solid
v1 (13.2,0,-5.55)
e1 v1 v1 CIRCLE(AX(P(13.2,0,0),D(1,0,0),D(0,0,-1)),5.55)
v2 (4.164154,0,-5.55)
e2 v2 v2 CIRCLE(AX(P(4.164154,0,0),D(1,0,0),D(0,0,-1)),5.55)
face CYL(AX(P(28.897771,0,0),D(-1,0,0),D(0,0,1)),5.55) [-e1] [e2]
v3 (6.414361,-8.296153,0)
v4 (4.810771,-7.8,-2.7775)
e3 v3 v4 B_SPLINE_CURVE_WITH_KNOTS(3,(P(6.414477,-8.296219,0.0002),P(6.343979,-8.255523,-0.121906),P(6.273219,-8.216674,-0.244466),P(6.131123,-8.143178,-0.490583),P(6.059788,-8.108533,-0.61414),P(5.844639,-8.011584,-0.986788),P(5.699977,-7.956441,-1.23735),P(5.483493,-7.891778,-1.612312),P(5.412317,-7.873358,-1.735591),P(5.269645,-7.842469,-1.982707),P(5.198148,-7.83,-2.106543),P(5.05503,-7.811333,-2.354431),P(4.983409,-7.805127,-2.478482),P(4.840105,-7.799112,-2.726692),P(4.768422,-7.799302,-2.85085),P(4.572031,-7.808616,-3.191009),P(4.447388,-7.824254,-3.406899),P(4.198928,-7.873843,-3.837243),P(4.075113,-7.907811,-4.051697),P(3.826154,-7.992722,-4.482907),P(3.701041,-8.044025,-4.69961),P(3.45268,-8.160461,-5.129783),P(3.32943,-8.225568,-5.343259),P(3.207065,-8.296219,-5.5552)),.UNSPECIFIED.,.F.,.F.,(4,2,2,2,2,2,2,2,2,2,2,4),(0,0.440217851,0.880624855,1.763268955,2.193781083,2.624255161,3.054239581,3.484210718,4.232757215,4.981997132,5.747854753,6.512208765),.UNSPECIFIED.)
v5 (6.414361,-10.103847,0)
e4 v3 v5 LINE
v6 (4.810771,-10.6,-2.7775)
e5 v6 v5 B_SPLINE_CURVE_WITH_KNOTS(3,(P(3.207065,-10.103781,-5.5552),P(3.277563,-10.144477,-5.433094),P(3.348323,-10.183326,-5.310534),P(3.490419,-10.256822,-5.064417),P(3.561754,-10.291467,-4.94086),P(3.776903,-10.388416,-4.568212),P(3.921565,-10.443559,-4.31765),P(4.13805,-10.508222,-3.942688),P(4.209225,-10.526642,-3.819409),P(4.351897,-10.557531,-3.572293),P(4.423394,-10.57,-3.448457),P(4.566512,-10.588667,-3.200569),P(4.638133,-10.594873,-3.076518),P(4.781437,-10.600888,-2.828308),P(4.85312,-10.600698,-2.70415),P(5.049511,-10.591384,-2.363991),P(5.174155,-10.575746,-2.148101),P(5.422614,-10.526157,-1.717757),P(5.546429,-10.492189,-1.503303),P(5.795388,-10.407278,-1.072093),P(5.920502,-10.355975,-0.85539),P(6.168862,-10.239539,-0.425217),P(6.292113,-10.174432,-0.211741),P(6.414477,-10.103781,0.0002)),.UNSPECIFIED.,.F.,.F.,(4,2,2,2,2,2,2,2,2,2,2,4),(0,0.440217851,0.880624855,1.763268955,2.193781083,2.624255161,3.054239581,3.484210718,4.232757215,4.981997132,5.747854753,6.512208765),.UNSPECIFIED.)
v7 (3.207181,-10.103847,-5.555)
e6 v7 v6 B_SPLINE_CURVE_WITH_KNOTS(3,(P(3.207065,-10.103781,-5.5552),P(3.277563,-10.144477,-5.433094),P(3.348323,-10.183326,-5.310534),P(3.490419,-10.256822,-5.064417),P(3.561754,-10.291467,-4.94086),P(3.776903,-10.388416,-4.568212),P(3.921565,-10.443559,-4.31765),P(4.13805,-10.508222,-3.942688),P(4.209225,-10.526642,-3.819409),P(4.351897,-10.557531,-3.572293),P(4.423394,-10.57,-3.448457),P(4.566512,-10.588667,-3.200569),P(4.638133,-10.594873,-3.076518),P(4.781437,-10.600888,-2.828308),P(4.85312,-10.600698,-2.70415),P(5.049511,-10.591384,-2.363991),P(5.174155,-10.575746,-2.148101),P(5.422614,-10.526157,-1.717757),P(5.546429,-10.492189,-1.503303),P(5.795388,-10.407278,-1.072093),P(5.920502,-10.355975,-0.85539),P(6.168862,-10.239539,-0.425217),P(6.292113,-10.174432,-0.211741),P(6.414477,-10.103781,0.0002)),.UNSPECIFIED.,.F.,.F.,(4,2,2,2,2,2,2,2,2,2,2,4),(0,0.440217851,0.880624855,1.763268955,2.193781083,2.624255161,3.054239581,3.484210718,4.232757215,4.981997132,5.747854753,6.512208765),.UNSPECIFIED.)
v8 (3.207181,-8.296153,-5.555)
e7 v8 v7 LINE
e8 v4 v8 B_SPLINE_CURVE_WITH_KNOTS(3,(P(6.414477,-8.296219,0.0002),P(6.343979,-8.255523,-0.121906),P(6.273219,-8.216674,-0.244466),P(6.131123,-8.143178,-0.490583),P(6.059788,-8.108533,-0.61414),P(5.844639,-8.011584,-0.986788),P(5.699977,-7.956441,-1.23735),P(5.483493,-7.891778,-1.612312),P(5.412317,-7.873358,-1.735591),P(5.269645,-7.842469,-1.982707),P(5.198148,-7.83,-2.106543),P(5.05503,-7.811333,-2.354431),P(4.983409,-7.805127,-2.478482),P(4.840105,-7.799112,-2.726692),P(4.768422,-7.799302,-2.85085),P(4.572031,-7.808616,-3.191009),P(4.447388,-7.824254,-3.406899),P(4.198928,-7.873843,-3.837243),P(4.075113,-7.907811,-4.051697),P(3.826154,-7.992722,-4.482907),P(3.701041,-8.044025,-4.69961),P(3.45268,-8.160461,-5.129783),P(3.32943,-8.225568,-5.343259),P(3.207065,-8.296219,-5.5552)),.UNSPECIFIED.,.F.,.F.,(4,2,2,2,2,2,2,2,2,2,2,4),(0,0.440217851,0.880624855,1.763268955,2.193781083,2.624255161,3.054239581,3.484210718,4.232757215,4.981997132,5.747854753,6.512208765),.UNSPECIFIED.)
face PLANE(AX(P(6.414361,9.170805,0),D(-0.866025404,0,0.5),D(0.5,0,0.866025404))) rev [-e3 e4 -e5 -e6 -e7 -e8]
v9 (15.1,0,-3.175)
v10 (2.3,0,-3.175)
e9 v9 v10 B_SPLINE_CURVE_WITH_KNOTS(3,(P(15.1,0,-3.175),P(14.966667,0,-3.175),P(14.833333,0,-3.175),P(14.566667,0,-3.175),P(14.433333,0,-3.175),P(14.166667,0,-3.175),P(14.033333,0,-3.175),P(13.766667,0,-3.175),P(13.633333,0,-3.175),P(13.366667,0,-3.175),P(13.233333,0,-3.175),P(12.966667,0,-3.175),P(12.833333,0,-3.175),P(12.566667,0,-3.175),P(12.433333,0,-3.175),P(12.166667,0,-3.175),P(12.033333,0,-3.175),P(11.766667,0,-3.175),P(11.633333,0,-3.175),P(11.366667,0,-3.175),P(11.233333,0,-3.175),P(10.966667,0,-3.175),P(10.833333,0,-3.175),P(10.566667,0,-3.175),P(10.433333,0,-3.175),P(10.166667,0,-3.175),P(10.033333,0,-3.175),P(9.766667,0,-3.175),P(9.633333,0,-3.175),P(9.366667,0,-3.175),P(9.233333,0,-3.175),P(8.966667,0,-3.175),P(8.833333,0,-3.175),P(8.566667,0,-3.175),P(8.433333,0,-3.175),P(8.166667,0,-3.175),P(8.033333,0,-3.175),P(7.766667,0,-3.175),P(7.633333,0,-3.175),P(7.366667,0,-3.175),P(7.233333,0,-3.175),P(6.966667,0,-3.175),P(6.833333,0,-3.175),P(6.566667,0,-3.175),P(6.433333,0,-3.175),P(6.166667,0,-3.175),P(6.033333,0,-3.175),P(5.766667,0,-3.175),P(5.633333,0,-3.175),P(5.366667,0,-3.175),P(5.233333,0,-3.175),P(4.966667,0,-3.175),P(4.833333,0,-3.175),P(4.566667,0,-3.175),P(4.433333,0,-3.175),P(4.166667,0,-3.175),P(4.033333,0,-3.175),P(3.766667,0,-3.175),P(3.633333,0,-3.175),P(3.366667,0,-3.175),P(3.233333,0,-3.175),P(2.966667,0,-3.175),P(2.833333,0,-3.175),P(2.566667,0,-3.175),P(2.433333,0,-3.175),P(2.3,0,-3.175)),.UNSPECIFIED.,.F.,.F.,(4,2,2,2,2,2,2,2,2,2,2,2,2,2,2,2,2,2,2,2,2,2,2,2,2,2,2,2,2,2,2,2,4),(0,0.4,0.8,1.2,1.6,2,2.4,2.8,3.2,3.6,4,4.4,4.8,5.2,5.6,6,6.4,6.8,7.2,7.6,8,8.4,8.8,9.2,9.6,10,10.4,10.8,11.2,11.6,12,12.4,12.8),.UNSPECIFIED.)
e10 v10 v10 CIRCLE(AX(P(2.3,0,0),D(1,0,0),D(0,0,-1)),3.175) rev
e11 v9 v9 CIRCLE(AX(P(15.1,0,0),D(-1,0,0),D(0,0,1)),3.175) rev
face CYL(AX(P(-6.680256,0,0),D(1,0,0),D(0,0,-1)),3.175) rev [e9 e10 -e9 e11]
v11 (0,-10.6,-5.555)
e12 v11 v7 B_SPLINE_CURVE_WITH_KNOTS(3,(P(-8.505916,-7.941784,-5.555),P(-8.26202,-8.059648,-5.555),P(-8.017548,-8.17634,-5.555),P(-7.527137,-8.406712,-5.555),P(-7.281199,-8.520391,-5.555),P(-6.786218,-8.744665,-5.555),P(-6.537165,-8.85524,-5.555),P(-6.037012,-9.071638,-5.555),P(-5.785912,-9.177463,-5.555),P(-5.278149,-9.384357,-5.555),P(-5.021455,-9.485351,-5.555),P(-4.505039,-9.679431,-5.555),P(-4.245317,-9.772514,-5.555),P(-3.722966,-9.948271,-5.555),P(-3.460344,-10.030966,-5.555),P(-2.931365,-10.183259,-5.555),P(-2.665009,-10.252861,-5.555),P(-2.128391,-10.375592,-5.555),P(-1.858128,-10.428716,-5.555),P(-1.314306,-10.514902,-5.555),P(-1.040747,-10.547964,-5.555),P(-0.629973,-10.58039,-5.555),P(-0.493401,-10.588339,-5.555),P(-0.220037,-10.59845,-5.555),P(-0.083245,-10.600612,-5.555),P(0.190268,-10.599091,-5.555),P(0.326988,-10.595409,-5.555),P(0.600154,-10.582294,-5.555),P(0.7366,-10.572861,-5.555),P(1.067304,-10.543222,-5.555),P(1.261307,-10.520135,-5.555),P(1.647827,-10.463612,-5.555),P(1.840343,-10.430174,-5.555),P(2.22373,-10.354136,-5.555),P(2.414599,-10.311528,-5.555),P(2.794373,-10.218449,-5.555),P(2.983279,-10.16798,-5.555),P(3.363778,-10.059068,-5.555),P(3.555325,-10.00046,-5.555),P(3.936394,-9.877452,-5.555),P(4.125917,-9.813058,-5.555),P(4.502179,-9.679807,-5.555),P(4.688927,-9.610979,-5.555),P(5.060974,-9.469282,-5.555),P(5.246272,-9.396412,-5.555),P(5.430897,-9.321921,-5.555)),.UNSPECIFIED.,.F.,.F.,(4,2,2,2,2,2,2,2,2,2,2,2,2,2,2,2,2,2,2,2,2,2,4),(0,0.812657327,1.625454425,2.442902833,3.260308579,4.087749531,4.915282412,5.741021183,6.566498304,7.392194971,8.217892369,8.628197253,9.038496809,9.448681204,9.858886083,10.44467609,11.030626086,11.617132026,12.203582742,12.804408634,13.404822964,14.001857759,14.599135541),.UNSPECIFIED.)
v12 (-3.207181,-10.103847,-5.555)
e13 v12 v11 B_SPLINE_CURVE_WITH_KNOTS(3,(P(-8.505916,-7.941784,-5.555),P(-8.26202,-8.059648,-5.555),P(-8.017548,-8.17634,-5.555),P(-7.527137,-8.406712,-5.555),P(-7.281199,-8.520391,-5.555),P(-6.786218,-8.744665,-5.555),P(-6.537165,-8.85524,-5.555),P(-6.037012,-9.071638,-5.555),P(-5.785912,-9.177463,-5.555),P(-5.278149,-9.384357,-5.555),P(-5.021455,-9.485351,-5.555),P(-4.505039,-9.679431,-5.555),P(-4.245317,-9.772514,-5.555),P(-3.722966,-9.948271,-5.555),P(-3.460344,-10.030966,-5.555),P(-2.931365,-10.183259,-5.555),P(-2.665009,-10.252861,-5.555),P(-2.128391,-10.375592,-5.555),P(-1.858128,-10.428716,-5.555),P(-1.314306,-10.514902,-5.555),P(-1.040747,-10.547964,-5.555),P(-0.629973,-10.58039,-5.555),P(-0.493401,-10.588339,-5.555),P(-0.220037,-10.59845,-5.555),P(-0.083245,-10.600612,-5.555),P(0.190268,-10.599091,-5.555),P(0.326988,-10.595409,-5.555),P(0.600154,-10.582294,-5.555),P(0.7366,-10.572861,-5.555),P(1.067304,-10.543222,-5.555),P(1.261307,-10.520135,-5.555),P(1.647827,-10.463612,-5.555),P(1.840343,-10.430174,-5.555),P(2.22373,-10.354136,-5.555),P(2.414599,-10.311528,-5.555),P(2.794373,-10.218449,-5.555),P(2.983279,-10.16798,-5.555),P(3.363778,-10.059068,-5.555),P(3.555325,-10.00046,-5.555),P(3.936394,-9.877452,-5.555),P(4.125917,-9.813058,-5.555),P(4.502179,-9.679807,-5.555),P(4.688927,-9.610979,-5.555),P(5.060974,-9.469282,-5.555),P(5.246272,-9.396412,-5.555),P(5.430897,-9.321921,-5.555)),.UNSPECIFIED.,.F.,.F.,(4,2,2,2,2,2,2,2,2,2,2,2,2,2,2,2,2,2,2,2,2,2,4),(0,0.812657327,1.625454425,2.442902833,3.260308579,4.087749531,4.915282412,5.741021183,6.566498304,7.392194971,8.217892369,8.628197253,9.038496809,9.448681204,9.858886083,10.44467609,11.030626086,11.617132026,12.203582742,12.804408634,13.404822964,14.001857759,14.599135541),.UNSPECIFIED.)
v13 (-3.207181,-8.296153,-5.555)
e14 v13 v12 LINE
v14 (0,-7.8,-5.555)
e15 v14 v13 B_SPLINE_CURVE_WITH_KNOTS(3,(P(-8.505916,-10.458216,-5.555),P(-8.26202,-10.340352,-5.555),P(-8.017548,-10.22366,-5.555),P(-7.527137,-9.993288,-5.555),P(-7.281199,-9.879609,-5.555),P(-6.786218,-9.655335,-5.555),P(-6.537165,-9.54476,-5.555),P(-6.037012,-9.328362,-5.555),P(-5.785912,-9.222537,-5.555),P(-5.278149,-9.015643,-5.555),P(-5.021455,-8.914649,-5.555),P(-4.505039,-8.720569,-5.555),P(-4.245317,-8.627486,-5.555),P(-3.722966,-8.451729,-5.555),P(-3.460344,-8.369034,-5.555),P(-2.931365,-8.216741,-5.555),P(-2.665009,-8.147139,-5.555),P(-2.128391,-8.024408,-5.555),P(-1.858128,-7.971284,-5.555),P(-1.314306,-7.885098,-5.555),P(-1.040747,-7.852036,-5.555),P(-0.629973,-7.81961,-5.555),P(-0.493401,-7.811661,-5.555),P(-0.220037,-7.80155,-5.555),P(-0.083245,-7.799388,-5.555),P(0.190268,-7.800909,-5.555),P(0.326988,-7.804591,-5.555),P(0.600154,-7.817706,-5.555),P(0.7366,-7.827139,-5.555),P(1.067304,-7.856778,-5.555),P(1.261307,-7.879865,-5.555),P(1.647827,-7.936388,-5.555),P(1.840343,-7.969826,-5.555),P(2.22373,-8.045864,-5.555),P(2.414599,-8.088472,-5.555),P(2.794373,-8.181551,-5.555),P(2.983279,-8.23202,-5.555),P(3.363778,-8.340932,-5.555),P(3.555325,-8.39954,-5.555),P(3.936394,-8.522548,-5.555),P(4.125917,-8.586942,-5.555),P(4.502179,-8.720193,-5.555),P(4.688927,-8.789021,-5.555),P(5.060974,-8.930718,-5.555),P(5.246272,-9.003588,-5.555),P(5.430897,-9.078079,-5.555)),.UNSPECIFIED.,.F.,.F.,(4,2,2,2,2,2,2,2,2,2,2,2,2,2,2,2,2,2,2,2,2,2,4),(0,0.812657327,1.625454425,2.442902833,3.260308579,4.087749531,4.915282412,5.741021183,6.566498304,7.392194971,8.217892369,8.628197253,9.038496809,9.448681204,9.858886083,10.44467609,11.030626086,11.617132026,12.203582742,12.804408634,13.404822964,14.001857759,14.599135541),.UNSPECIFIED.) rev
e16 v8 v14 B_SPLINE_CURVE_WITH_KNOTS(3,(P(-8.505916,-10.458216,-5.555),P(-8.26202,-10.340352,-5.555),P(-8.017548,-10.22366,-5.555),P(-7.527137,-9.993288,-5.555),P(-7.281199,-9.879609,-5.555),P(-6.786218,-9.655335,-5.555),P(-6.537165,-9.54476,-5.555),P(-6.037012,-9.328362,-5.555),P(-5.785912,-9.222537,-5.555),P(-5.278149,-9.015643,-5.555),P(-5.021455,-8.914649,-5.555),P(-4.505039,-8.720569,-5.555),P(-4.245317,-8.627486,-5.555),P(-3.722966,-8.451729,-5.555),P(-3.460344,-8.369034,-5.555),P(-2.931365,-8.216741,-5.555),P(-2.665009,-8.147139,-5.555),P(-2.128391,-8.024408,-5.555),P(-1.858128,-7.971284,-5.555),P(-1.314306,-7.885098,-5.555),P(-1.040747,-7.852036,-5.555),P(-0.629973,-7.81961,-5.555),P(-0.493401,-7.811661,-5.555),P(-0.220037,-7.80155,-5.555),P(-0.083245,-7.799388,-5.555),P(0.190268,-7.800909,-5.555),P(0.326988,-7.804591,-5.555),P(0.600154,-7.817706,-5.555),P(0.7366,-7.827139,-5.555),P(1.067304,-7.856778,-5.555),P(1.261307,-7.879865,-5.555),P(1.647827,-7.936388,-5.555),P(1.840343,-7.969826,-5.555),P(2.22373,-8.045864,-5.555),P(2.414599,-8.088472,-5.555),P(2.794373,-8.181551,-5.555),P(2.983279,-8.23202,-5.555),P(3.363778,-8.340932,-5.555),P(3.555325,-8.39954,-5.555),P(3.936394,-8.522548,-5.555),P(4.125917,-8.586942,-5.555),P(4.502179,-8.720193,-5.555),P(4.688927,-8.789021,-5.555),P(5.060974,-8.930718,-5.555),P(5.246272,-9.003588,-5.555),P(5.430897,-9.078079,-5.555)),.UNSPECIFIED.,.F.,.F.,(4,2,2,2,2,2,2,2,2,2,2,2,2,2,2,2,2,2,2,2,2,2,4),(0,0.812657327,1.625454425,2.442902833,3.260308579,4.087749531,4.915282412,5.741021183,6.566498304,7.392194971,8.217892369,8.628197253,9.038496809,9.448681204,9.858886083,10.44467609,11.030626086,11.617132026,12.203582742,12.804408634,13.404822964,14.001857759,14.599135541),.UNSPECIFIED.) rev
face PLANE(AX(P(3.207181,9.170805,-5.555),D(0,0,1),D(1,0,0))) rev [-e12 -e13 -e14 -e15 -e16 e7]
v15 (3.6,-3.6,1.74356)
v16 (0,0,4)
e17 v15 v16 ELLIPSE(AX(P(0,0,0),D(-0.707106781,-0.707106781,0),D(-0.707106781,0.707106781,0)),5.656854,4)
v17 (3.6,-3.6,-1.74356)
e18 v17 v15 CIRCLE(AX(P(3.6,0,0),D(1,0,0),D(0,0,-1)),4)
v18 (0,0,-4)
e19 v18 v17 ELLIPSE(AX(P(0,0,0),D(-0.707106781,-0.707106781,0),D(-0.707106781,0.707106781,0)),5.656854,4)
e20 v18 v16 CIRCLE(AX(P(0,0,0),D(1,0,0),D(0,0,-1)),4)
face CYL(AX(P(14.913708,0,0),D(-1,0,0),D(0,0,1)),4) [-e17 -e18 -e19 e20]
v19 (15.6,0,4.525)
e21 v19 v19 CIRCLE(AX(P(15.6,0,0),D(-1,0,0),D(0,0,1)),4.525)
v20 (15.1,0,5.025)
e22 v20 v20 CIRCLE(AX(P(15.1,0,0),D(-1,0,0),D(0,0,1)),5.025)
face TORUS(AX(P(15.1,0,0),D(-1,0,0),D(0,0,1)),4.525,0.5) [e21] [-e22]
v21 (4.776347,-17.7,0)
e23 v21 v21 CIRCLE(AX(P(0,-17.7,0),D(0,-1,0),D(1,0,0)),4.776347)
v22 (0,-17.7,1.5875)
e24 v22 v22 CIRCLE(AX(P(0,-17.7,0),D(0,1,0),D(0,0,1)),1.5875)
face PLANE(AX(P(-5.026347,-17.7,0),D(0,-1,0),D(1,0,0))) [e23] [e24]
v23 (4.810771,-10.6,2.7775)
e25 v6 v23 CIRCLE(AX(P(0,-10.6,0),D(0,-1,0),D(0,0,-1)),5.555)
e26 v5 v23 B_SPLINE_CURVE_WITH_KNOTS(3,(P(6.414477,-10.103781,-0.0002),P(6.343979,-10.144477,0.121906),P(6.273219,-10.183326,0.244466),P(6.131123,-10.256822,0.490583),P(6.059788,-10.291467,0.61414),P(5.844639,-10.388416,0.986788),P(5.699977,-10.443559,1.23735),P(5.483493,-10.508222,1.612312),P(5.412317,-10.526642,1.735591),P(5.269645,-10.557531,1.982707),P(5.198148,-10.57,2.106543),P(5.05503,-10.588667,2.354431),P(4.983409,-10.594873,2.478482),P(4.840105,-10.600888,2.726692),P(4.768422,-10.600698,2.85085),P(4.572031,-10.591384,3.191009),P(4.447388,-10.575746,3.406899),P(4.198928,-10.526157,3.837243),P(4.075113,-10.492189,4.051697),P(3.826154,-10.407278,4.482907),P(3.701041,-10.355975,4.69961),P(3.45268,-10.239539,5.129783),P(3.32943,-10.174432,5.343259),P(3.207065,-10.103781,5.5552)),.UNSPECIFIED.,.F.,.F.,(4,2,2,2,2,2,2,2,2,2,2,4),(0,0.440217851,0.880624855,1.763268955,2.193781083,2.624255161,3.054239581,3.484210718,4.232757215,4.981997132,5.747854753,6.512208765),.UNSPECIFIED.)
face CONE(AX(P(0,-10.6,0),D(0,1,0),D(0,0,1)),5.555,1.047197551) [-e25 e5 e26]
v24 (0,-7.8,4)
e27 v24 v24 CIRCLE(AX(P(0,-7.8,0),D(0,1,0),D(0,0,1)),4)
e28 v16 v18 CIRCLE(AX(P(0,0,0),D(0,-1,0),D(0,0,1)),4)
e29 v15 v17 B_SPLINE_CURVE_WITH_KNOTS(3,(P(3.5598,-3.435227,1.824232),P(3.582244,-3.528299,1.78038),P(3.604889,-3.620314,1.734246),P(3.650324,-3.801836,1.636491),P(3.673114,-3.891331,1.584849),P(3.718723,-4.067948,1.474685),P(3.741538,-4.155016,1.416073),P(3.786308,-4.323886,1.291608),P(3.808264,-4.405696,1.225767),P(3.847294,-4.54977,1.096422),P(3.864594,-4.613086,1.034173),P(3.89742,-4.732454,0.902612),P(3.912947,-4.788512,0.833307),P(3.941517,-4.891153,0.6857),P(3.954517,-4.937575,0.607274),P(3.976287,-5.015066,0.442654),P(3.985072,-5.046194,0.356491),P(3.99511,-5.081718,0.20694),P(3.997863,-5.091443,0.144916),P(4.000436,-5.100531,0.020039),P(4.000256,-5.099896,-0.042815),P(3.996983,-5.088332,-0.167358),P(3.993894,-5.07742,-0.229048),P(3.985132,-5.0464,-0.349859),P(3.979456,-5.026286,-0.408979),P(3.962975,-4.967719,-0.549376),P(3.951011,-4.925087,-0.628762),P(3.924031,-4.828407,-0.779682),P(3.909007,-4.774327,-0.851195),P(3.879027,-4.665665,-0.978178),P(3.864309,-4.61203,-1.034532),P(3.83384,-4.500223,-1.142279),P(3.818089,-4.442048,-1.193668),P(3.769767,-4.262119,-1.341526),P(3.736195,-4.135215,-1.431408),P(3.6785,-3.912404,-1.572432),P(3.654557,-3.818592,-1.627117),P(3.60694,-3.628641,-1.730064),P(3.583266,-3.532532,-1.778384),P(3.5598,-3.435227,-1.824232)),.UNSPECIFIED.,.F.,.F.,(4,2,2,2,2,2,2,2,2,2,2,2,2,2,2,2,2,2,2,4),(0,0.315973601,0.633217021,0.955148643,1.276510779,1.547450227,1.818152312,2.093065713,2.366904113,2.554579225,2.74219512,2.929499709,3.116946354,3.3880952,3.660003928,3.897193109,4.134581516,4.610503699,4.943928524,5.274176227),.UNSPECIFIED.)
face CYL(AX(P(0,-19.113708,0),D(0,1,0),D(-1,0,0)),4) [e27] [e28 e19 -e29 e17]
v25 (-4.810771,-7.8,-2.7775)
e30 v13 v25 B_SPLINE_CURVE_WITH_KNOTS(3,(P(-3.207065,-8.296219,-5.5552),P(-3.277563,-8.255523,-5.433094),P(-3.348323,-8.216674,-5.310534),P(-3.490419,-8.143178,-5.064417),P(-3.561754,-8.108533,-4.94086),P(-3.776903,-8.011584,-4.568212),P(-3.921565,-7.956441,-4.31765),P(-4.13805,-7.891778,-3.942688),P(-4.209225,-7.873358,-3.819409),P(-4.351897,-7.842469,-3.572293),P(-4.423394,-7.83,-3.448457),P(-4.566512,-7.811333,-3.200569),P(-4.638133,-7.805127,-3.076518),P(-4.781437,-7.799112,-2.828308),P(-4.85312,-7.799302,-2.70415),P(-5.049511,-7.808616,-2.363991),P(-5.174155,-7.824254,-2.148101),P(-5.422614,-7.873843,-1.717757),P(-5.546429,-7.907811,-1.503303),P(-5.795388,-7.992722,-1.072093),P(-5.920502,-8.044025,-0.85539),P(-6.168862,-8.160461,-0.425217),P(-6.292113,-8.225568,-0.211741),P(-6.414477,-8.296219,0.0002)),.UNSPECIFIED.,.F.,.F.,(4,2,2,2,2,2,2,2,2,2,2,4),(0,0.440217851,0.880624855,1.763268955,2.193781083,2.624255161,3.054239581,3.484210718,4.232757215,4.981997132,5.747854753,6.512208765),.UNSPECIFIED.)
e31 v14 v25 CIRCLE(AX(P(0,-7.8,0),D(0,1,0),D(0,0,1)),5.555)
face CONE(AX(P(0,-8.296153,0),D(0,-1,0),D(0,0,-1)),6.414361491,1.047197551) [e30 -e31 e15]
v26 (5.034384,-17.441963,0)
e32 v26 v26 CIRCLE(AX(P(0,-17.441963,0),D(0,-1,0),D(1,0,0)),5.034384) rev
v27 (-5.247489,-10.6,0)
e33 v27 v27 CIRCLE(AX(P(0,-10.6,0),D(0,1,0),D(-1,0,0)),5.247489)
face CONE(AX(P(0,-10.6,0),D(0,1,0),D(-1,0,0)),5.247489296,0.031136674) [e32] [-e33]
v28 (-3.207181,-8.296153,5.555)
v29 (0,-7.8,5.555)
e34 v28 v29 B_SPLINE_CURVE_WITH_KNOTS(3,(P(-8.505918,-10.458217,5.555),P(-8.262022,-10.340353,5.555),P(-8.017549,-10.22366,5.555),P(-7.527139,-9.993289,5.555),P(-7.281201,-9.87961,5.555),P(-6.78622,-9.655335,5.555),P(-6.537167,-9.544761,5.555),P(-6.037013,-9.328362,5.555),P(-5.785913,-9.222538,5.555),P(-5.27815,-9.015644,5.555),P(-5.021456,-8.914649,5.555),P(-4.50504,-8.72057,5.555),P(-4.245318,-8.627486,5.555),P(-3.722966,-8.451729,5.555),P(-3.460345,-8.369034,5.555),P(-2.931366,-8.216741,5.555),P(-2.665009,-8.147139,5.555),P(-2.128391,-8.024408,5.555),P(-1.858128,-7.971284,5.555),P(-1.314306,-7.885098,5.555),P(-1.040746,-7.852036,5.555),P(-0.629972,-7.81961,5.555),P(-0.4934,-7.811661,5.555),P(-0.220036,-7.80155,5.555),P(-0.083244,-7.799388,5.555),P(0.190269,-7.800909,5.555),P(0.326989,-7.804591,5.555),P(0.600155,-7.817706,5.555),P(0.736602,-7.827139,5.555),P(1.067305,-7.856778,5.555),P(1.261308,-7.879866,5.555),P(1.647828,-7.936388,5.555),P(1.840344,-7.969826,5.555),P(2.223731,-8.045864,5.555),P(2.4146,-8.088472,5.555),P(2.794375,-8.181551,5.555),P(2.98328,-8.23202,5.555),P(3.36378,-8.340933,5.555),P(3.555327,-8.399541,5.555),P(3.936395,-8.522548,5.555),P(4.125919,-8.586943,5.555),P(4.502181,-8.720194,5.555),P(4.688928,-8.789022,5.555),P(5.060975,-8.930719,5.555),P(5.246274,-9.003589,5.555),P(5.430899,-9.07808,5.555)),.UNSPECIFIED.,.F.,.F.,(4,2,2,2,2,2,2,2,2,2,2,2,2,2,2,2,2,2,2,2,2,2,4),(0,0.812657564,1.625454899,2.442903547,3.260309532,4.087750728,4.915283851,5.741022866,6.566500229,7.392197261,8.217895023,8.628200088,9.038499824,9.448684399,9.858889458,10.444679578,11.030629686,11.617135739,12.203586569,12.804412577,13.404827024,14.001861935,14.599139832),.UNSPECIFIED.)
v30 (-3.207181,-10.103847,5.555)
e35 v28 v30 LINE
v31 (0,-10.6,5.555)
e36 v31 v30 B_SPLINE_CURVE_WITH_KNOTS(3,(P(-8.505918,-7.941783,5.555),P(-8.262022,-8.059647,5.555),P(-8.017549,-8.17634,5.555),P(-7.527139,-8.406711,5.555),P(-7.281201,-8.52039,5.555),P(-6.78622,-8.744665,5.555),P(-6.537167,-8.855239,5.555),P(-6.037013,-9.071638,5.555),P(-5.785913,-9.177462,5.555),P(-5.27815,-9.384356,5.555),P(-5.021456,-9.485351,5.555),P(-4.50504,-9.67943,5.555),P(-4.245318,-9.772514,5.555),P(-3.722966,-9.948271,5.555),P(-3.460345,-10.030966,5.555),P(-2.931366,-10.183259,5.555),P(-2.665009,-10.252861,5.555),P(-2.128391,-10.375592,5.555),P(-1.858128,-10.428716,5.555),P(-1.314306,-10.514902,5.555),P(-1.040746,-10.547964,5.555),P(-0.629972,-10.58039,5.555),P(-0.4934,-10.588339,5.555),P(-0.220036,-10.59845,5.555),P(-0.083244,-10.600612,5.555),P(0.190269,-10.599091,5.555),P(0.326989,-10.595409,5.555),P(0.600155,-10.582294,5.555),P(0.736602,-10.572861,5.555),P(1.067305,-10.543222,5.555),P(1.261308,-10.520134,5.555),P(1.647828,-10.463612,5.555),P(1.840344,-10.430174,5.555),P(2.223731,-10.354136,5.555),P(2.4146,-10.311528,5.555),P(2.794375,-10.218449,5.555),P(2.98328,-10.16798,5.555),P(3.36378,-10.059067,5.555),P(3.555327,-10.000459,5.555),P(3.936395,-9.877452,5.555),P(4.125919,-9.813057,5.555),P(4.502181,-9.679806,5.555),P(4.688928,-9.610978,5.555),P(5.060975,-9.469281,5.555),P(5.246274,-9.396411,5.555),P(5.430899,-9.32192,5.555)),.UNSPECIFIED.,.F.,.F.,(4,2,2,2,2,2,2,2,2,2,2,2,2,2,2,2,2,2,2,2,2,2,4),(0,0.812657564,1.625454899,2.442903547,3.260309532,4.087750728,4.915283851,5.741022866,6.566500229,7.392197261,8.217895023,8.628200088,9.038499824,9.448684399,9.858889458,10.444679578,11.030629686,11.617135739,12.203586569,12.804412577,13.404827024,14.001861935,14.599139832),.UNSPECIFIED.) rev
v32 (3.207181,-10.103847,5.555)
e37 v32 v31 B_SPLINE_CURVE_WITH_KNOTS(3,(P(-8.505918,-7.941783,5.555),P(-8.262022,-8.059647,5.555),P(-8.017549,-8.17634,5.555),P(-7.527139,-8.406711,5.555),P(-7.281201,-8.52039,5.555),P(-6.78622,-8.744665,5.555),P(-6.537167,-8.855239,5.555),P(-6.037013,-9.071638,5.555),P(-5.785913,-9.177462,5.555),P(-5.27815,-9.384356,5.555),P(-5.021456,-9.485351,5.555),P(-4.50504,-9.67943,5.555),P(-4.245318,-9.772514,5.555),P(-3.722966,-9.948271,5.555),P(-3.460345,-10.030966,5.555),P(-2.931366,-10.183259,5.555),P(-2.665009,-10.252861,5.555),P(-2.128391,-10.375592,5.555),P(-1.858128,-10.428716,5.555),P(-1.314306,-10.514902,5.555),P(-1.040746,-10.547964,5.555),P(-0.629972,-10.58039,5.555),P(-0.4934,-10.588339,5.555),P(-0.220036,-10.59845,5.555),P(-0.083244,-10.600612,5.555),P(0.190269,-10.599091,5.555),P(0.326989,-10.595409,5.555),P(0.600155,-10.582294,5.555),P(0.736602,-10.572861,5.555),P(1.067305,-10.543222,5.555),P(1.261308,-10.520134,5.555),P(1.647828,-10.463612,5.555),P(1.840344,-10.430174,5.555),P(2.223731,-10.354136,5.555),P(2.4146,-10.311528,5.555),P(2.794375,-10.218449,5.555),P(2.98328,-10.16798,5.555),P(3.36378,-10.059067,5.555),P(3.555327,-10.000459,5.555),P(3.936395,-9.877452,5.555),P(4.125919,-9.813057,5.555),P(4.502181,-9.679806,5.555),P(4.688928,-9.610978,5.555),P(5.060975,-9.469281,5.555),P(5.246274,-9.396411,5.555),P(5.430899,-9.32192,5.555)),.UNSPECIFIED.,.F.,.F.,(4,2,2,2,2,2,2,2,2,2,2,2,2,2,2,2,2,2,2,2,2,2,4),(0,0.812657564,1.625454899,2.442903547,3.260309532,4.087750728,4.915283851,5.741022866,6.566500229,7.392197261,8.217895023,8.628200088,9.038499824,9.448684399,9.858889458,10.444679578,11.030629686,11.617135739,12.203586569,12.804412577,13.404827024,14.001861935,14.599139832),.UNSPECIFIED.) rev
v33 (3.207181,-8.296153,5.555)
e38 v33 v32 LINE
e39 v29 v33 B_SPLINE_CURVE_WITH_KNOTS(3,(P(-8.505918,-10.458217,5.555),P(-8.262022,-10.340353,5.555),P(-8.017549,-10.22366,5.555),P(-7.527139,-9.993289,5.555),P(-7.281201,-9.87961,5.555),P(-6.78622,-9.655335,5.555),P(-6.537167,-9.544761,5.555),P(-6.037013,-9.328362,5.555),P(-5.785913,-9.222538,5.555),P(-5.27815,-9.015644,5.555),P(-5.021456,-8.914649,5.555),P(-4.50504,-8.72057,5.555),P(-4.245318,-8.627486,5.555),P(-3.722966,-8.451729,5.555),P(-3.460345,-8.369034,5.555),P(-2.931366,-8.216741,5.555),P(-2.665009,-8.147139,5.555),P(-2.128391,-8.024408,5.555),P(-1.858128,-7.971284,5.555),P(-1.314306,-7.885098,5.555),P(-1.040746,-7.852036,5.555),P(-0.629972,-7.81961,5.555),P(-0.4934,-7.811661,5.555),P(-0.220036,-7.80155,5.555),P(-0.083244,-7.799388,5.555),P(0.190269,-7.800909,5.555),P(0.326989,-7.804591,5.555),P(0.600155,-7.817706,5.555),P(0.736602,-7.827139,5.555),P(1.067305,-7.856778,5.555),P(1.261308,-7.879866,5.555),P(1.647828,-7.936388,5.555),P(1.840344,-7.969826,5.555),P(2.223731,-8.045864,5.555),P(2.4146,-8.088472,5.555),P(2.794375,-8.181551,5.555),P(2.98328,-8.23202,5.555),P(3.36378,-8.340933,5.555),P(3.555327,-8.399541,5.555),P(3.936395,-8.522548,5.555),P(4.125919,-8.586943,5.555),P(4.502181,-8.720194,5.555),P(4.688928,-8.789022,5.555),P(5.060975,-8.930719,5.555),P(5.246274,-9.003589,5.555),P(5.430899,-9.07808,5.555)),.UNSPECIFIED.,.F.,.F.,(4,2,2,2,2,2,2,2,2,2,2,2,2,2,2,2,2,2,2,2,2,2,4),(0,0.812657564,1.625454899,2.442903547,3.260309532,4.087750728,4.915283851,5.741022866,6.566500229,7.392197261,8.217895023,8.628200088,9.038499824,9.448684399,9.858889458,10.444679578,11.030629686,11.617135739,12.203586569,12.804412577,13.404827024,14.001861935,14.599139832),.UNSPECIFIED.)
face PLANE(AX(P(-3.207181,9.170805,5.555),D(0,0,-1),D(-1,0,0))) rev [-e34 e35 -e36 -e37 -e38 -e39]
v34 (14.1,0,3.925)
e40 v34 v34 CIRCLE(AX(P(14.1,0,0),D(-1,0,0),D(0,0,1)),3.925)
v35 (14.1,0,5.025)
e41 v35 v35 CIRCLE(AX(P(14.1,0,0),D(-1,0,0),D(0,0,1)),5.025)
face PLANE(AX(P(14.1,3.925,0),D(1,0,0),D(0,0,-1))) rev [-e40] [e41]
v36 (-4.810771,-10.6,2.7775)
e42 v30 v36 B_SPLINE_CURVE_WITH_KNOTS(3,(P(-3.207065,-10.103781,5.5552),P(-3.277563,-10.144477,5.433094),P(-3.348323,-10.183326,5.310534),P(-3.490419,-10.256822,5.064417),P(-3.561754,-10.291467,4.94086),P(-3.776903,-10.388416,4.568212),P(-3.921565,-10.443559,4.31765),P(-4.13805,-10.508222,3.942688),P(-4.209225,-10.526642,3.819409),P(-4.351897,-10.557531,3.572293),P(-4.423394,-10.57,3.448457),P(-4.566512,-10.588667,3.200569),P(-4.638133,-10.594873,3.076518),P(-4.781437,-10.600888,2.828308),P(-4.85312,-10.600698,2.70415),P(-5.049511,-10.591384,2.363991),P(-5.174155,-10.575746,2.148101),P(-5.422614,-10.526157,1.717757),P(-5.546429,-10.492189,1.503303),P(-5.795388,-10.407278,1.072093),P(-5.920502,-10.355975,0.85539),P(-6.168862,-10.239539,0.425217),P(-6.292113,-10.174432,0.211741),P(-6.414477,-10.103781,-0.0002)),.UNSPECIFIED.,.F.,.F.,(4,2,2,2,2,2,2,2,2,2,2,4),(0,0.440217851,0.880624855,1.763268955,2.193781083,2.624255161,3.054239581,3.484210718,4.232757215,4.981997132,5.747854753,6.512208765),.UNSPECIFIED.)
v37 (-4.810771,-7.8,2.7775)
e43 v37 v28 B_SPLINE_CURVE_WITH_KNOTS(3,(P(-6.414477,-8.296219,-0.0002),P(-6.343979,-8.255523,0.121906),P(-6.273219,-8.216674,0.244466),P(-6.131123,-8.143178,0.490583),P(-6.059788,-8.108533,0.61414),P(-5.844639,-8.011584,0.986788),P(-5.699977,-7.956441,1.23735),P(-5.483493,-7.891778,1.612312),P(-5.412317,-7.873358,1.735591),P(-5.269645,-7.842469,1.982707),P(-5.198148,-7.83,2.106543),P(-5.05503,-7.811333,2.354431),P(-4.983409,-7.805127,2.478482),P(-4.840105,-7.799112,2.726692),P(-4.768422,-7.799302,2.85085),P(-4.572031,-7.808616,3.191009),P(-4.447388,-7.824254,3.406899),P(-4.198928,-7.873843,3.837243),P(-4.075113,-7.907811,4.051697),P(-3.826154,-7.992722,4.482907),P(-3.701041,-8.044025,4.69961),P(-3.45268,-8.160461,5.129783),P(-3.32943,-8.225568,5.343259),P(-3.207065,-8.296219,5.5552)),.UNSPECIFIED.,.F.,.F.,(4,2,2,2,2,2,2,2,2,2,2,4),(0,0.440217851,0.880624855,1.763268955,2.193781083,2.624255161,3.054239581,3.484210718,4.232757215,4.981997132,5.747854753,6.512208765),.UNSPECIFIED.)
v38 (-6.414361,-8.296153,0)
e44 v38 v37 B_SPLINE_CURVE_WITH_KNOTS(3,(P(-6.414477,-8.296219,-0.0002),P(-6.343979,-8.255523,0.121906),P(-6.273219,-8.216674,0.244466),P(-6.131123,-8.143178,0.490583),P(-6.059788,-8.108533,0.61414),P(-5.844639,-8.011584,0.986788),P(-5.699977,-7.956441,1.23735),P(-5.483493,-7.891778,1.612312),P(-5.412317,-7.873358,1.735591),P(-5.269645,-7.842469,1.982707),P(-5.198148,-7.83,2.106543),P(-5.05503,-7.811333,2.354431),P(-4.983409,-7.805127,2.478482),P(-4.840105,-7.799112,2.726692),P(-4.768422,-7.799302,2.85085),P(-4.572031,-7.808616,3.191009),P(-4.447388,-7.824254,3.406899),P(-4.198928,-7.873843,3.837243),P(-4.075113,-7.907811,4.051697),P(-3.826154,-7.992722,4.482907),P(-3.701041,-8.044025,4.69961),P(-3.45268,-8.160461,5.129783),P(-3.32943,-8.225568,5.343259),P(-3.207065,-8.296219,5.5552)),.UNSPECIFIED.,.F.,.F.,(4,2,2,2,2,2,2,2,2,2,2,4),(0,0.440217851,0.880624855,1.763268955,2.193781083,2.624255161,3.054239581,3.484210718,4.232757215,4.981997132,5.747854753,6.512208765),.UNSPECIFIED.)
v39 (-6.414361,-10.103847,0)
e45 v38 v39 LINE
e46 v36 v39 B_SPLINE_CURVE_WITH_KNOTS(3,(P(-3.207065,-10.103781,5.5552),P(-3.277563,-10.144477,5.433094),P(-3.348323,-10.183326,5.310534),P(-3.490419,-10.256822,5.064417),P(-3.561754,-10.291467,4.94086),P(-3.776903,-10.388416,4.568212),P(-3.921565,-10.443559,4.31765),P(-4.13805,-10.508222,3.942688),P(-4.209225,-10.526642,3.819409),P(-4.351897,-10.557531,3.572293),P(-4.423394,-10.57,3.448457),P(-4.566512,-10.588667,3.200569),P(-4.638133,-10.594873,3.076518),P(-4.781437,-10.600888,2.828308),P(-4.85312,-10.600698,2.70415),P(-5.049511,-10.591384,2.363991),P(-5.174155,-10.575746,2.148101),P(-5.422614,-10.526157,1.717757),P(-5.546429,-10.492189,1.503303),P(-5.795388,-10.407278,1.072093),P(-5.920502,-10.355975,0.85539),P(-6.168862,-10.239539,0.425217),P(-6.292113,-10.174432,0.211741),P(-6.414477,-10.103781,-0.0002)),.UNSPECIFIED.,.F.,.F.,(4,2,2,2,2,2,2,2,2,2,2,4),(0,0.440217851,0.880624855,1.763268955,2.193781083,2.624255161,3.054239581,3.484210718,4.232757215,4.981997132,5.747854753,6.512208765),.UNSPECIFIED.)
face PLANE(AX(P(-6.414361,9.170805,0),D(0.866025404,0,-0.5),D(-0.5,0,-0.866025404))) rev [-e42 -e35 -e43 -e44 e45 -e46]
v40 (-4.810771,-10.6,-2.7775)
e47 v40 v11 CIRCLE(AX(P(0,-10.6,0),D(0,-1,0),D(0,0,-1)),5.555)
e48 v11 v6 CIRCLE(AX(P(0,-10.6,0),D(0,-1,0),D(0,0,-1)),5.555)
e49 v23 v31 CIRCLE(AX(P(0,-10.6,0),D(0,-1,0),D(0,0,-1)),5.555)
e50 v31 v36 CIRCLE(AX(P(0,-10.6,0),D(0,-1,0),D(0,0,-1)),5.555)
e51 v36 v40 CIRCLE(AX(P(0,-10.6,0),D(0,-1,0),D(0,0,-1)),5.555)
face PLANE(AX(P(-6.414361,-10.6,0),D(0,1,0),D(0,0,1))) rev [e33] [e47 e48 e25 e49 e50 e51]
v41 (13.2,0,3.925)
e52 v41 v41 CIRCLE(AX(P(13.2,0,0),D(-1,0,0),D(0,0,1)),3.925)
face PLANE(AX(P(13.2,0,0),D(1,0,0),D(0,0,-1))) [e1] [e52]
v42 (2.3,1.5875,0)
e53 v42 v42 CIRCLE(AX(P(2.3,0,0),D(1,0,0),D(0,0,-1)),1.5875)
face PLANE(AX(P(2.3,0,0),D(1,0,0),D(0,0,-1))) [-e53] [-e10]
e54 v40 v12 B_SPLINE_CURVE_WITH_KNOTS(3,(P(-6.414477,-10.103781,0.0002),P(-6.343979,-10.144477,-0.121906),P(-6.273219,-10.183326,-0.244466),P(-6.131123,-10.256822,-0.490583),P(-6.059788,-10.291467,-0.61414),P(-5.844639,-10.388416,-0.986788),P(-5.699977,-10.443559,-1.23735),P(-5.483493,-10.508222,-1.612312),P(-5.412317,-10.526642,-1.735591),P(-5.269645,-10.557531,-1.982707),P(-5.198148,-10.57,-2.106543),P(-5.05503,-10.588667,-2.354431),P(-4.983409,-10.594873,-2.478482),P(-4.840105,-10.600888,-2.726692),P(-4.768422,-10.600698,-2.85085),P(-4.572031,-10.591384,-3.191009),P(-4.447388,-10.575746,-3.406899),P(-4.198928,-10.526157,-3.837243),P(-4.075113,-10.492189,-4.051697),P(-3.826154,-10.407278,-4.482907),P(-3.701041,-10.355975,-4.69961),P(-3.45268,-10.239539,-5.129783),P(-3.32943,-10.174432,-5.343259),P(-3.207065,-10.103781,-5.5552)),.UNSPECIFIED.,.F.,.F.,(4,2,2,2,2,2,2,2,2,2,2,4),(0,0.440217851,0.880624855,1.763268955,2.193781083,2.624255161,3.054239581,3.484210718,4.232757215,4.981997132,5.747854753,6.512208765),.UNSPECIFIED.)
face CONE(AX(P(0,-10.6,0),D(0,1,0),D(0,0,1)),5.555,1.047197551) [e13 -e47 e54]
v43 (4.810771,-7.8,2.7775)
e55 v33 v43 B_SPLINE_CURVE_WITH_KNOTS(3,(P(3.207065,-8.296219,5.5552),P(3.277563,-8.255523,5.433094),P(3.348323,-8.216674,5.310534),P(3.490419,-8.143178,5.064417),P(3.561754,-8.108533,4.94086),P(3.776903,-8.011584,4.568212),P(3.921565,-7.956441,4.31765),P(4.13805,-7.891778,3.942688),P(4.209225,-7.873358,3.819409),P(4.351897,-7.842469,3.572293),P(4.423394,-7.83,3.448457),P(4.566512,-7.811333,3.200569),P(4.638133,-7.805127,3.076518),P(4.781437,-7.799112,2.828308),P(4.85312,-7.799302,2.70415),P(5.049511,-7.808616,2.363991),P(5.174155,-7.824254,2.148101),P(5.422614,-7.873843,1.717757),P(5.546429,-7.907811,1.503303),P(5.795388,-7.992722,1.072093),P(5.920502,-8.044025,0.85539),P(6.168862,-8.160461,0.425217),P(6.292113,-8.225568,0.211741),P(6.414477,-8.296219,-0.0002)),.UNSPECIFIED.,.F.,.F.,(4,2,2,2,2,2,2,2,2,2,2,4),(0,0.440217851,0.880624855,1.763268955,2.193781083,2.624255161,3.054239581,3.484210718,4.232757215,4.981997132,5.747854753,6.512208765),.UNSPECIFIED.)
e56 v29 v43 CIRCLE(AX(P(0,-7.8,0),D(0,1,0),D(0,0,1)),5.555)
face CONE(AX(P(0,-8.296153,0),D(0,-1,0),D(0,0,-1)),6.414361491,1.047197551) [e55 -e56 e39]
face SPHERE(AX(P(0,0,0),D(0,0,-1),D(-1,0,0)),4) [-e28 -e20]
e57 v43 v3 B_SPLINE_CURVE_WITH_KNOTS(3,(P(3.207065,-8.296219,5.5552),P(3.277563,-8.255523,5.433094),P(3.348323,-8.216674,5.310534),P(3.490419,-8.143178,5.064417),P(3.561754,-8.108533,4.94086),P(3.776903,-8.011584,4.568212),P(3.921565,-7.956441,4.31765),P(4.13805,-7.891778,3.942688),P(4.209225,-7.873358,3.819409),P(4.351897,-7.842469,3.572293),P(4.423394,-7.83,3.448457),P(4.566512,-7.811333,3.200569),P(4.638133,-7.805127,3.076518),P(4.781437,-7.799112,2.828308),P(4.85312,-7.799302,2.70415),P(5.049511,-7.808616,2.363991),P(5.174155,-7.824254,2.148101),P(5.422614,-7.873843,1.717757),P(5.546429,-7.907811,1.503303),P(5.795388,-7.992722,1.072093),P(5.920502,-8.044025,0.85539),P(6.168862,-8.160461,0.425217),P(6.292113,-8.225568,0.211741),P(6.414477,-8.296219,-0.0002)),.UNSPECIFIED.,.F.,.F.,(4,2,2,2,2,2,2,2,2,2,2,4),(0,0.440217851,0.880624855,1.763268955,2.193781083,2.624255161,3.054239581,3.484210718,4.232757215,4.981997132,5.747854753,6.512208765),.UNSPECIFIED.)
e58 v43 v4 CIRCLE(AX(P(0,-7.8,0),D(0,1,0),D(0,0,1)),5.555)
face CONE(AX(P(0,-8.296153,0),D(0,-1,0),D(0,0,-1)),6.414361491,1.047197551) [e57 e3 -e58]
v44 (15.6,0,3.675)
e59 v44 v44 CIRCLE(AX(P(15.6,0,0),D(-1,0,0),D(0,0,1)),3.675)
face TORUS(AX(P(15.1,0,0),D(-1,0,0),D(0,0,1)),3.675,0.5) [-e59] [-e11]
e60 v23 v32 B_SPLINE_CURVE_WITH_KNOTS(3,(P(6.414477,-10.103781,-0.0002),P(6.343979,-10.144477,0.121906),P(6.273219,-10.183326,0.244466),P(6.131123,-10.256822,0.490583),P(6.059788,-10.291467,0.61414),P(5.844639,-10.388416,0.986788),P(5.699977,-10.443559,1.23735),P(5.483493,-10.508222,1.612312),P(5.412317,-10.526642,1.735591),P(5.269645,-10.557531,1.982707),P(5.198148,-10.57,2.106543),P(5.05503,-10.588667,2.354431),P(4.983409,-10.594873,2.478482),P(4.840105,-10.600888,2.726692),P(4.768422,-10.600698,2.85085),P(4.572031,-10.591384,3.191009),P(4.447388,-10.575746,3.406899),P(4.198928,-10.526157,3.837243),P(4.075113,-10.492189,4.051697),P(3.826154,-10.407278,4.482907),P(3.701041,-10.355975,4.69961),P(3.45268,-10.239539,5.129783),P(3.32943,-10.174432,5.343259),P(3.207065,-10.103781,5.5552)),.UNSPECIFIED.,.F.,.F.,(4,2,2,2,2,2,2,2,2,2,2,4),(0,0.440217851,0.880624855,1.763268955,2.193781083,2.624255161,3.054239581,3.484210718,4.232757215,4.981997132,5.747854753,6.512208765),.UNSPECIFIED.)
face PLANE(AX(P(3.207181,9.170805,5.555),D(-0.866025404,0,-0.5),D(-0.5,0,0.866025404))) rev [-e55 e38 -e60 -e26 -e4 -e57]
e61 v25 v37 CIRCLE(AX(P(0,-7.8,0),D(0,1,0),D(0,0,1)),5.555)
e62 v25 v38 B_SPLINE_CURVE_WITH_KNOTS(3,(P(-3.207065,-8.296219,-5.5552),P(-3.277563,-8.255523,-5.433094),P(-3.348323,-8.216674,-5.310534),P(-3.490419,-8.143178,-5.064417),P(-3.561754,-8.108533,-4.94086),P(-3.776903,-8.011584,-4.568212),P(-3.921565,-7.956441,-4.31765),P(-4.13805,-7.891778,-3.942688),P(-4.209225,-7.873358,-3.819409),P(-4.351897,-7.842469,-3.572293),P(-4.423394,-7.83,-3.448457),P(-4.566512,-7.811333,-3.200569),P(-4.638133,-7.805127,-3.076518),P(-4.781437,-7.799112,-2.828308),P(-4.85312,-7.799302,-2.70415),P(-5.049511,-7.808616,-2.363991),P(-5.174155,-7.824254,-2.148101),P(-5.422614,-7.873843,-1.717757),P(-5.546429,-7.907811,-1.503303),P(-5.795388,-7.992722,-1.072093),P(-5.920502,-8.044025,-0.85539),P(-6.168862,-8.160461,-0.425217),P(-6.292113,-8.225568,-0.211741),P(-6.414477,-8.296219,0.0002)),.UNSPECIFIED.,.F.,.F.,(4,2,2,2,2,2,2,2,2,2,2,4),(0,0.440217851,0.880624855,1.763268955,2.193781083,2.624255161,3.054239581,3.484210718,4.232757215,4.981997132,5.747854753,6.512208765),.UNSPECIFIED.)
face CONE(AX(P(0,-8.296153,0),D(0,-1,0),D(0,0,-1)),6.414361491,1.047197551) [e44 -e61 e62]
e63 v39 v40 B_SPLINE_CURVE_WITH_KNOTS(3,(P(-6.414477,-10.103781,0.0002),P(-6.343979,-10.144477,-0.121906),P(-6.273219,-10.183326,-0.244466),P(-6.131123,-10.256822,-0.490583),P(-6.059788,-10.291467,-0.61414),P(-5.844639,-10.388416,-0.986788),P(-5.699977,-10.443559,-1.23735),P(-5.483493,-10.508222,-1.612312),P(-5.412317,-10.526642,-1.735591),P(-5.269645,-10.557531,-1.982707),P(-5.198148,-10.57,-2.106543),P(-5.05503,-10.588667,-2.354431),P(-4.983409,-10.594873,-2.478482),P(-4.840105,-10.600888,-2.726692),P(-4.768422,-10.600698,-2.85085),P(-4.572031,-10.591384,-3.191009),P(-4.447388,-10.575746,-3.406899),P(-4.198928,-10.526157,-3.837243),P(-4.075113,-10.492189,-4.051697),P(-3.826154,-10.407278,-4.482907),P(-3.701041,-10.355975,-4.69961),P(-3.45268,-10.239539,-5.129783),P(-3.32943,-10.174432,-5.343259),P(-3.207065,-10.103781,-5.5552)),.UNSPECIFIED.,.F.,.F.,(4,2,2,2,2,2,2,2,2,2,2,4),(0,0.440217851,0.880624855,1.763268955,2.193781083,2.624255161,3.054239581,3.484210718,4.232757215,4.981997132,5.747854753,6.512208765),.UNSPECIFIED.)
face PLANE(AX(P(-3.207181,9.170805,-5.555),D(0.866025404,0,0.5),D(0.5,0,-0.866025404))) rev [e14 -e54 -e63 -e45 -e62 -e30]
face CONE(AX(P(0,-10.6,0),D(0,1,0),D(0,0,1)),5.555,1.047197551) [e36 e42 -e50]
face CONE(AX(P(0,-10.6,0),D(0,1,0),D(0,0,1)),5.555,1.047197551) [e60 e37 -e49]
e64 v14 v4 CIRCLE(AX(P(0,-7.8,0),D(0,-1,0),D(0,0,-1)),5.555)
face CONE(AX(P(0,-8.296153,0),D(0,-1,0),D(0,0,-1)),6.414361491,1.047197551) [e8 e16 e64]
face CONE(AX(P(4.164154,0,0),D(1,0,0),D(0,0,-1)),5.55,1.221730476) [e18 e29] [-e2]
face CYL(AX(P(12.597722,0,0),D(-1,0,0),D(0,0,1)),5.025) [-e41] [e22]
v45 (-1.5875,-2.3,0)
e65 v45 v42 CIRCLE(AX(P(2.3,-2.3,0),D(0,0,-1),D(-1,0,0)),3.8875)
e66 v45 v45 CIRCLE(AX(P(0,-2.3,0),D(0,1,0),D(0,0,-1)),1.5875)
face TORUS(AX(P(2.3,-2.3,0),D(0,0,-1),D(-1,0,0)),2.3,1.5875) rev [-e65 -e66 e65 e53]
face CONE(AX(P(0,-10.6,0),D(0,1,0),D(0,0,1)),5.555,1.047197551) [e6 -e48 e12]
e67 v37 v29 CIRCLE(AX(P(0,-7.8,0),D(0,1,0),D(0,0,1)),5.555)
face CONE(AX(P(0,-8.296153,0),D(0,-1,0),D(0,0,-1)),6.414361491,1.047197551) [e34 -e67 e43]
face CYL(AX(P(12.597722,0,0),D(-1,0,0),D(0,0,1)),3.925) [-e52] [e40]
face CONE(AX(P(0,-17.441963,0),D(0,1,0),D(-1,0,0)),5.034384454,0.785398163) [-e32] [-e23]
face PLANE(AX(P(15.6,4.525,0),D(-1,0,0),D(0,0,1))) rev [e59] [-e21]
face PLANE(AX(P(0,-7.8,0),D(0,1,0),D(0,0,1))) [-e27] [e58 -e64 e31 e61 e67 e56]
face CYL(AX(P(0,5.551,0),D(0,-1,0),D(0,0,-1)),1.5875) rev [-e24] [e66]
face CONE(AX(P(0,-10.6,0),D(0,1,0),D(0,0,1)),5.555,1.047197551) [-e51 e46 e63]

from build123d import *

# Parameters (mm, degrees)
SKETCH1_R             = 4
BASE_EXTRUDE_DEPTH    = 3.6
RBODY_SKETCH_R        = 5.55
RBODY_DEPTH           = 9.6
ELBOW_ANGLE           = 90
SKETCH3_R             = 4
BOSS_EXTRUDE1_DEPTH   = 7.8
NUT_DEPTH             = 2.8
RTUBE_START           = -13.3
RTUBE_SKETCH_R        = 3.175
RTUBE_DEPTH           = 13.3
RTUBE_RADIUS_R        = 0.5
DIAMETER_R            = 1.5875
SKETCH4_W             = 3.5
SKETCH4_H             = 3.95
PORT_THREADS_REACH    = 30.544
PORT_THREADS_SKETCH_R = 1.5875


with BuildPart() as part:
    # Sketch1 → Base-Extrude (new body)
    with BuildSketch(Plane(origin=(0, 0, 0), x_dir=(0, 0, -1), z_dir=(1, 0, 0))):
        with Locations(Location((0, 0, 0), (0, 0, 180))):
            Circle(SKETCH1_R)
    extrude(amount=BASE_EXTRUDE_DEPTH)

    # RBody_Sketch → RBody (add)
    with BuildSketch(Plane(origin=(3.6, 0, 0), x_dir=(0, 0, -1), z_dir=(1, 0, 0))):
        Circle(RBODY_SKETCH_R)
    extrude(amount=RBODY_DEPTH)

    # RBody_Chamfer: read off the stored shape, not the designer's step
    # RBody_Chamfer outline → RBody_Chamfer (revolve, cut)
    with BuildSketch(Plane.YX):
        Polygon((5.55, 4.164153863), (4, 3.6), (5.55, 3.6), align=None)
    revolve(axis=Axis((0, 0, 0), (1, 0, 0)), mode=Mode.SUBTRACT)

    # RRelease_Sketch → RRelease (revolve)
    with BuildSketch(Plane.XY, mode=Mode.PRIVATE) as rrelease_sk:
        with BuildLine():
            Line((13.2, 3.925), (14.1, 3.925))
            Line((14.1, 3.925), (14.1, 5.025))
            Line((14.1, 5.025), (15.1, 5.025))
            ThreePointArc((15.1, 5.025), (15.453553391, 4.878553391), (15.6, 4.525))
            Line((15.6, 4.525), (15.6, 0))
            Line((15.6, 0), (13.2, 0))
            Line((13.2, 0), (13.2, 3.925))
        make_face()
    revolve(rrelease_sk.sketch.rotate(Axis((12.597722381, 0, 0), (1, 0, 0)), 90), axis=Axis((12.597722381, 0, 0), (1, 0, 0)))

    # Elbow_Sketch → Elbow (revolve)
    with BuildSketch(Plane.ZY):
        with BuildLine():
            Line((-4, 0), (4, 0))
            ThreePointArc((4, 0), (0, 4), (-4, 0))
        make_face()
    revolve(axis=Axis((0, 0, -6.487672297), (0, 0, 1)), revolution_arc=ELBOW_ANGLE)

    # Sketch3 → Boss-Extrude1 (add)
    with BuildSketch(Plane.XZ):
        with Locations(Location((0, 0, 0), (0, 0, 90))):
            Circle(SKETCH3_R)
    extrude(amount=BOSS_EXTRUDE1_DEPTH)

    # Nut_Sketch → Nut (add)
    with BuildSketch(Plane(origin=(0, -10.6, 0), x_dir=(-1, 0, 0), z_dir=(0, 1, 0))):
        Polygon((6.414361491, 0), (3.207180745, 5.555), (-3.207180745, 5.555), (-6.414361491, 0), (-3.207180745, -5.555), (3.207180745, -5.555), align=None)
    extrude(amount=NUT_DEPTH)

    # Nut_Chamfer_Sketch → Nut_Chamfer (revolve, cut)
    with BuildSketch(Plane.XY):
        Polygon((-5.555, -7.8), (-6.414361491, -7.8), (-6.414361491, -8.296152588), align=None)
        Polygon((-6.414361491, -10.103847412), (-5.555, -10.6), (-6.414361491, -10.6), align=None)
    revolve(axis=Axis((0, -1.551633987, 0), (0, 1, 0)), mode=Mode.SUBTRACT)

    # Threads_Sketch → Threads (revolve)
    with BuildSketch(Plane.XY):
        Polygon((-5.247489296, -10.6), (-5.026347442, -17.7), (0, -17.7), (0, -10.6), align=None)
    revolve(axis=Axis((0, 0, 0), (0, -1, 0)))

    # Thread_Chamfer: read off the stored shape, not the designer's step
    # Thread_Chamfer outline → Thread_Chamfer (revolve, cut)
    with BuildSketch(Plane.XY):
        Polygon((5.034384454, -17.441962988), (4.776347442, -17.7), (5.034384454, -17.7), align=None)
    revolve(axis=Axis((0, 0, 0), (0, 1, 0)), mode=Mode.SUBTRACT)

    # RTube_Sketch → RTube (cut)
    with BuildSketch(Plane(origin=(15.6, 0, 0), x_dir=(0, 0, -1), z_dir=(1, 0, 0)).offset(RTUBE_START)):
        Circle(RTUBE_SKETCH_R)
    extrude(amount=RTUBE_DEPTH, mode=Mode.SUBTRACT)

    # RTube_Radius
    rtube_radius_edges = [part.edges().sort_by_distance(p)[0] for p in [
        (15.6, 0, 3.175),
    ]]
    fillet(rtube_radius_edges, radius=RTUBE_RADIUS_R)

    # Port_Curve: sweep along a path in Profile
    with BuildLine(Plane.XY) as port_curve_path:
        ThreePointArc((2.3, 0), (0.673654403, -0.673654403), (0, -2.3))
    # Diameter → Port_Curve (sweep, cut)
    with BuildSketch(Plane(origin=(2.3, 0, 0), x_dir=(0, 0, -1), z_dir=(1, 0, 0))):
        Circle(DIAMETER_R)
    sweep(path=port_curve_path.line, mode=Mode.SUBTRACT)

    # Sketch4 → Revolve1 (revolve)
    with BuildSketch(Plane.XY):
        with Locations((-1.75, -12.575)):
            Rectangle(SKETCH4_W, SKETCH4_H)
    revolve(axis=Axis((0, 0, 0), (0, -1, 0)))

    # Port_Threads_Sketch → Port_Threads (cut, up to next)
    with BuildSketch(Plane(origin=(0, -17.7, 0), x_dir=(-1, 0, 0), z_dir=(0, 1, 0)), mode=Mode.PRIVATE) as port_threads_sk1:
        Circle(PORT_THREADS_SKETCH_R)
    port_threads_tool1 = extrude(port_threads_sk1.sketch, amount=PORT_THREADS_REACH, mode=Mode.PRIVATE) & part.part
    add(port_threads_tool1.solids().sort_by_distance((0, -17.7, 0))[0], mode=Mode.SUBTRACT)


solid = part.part
